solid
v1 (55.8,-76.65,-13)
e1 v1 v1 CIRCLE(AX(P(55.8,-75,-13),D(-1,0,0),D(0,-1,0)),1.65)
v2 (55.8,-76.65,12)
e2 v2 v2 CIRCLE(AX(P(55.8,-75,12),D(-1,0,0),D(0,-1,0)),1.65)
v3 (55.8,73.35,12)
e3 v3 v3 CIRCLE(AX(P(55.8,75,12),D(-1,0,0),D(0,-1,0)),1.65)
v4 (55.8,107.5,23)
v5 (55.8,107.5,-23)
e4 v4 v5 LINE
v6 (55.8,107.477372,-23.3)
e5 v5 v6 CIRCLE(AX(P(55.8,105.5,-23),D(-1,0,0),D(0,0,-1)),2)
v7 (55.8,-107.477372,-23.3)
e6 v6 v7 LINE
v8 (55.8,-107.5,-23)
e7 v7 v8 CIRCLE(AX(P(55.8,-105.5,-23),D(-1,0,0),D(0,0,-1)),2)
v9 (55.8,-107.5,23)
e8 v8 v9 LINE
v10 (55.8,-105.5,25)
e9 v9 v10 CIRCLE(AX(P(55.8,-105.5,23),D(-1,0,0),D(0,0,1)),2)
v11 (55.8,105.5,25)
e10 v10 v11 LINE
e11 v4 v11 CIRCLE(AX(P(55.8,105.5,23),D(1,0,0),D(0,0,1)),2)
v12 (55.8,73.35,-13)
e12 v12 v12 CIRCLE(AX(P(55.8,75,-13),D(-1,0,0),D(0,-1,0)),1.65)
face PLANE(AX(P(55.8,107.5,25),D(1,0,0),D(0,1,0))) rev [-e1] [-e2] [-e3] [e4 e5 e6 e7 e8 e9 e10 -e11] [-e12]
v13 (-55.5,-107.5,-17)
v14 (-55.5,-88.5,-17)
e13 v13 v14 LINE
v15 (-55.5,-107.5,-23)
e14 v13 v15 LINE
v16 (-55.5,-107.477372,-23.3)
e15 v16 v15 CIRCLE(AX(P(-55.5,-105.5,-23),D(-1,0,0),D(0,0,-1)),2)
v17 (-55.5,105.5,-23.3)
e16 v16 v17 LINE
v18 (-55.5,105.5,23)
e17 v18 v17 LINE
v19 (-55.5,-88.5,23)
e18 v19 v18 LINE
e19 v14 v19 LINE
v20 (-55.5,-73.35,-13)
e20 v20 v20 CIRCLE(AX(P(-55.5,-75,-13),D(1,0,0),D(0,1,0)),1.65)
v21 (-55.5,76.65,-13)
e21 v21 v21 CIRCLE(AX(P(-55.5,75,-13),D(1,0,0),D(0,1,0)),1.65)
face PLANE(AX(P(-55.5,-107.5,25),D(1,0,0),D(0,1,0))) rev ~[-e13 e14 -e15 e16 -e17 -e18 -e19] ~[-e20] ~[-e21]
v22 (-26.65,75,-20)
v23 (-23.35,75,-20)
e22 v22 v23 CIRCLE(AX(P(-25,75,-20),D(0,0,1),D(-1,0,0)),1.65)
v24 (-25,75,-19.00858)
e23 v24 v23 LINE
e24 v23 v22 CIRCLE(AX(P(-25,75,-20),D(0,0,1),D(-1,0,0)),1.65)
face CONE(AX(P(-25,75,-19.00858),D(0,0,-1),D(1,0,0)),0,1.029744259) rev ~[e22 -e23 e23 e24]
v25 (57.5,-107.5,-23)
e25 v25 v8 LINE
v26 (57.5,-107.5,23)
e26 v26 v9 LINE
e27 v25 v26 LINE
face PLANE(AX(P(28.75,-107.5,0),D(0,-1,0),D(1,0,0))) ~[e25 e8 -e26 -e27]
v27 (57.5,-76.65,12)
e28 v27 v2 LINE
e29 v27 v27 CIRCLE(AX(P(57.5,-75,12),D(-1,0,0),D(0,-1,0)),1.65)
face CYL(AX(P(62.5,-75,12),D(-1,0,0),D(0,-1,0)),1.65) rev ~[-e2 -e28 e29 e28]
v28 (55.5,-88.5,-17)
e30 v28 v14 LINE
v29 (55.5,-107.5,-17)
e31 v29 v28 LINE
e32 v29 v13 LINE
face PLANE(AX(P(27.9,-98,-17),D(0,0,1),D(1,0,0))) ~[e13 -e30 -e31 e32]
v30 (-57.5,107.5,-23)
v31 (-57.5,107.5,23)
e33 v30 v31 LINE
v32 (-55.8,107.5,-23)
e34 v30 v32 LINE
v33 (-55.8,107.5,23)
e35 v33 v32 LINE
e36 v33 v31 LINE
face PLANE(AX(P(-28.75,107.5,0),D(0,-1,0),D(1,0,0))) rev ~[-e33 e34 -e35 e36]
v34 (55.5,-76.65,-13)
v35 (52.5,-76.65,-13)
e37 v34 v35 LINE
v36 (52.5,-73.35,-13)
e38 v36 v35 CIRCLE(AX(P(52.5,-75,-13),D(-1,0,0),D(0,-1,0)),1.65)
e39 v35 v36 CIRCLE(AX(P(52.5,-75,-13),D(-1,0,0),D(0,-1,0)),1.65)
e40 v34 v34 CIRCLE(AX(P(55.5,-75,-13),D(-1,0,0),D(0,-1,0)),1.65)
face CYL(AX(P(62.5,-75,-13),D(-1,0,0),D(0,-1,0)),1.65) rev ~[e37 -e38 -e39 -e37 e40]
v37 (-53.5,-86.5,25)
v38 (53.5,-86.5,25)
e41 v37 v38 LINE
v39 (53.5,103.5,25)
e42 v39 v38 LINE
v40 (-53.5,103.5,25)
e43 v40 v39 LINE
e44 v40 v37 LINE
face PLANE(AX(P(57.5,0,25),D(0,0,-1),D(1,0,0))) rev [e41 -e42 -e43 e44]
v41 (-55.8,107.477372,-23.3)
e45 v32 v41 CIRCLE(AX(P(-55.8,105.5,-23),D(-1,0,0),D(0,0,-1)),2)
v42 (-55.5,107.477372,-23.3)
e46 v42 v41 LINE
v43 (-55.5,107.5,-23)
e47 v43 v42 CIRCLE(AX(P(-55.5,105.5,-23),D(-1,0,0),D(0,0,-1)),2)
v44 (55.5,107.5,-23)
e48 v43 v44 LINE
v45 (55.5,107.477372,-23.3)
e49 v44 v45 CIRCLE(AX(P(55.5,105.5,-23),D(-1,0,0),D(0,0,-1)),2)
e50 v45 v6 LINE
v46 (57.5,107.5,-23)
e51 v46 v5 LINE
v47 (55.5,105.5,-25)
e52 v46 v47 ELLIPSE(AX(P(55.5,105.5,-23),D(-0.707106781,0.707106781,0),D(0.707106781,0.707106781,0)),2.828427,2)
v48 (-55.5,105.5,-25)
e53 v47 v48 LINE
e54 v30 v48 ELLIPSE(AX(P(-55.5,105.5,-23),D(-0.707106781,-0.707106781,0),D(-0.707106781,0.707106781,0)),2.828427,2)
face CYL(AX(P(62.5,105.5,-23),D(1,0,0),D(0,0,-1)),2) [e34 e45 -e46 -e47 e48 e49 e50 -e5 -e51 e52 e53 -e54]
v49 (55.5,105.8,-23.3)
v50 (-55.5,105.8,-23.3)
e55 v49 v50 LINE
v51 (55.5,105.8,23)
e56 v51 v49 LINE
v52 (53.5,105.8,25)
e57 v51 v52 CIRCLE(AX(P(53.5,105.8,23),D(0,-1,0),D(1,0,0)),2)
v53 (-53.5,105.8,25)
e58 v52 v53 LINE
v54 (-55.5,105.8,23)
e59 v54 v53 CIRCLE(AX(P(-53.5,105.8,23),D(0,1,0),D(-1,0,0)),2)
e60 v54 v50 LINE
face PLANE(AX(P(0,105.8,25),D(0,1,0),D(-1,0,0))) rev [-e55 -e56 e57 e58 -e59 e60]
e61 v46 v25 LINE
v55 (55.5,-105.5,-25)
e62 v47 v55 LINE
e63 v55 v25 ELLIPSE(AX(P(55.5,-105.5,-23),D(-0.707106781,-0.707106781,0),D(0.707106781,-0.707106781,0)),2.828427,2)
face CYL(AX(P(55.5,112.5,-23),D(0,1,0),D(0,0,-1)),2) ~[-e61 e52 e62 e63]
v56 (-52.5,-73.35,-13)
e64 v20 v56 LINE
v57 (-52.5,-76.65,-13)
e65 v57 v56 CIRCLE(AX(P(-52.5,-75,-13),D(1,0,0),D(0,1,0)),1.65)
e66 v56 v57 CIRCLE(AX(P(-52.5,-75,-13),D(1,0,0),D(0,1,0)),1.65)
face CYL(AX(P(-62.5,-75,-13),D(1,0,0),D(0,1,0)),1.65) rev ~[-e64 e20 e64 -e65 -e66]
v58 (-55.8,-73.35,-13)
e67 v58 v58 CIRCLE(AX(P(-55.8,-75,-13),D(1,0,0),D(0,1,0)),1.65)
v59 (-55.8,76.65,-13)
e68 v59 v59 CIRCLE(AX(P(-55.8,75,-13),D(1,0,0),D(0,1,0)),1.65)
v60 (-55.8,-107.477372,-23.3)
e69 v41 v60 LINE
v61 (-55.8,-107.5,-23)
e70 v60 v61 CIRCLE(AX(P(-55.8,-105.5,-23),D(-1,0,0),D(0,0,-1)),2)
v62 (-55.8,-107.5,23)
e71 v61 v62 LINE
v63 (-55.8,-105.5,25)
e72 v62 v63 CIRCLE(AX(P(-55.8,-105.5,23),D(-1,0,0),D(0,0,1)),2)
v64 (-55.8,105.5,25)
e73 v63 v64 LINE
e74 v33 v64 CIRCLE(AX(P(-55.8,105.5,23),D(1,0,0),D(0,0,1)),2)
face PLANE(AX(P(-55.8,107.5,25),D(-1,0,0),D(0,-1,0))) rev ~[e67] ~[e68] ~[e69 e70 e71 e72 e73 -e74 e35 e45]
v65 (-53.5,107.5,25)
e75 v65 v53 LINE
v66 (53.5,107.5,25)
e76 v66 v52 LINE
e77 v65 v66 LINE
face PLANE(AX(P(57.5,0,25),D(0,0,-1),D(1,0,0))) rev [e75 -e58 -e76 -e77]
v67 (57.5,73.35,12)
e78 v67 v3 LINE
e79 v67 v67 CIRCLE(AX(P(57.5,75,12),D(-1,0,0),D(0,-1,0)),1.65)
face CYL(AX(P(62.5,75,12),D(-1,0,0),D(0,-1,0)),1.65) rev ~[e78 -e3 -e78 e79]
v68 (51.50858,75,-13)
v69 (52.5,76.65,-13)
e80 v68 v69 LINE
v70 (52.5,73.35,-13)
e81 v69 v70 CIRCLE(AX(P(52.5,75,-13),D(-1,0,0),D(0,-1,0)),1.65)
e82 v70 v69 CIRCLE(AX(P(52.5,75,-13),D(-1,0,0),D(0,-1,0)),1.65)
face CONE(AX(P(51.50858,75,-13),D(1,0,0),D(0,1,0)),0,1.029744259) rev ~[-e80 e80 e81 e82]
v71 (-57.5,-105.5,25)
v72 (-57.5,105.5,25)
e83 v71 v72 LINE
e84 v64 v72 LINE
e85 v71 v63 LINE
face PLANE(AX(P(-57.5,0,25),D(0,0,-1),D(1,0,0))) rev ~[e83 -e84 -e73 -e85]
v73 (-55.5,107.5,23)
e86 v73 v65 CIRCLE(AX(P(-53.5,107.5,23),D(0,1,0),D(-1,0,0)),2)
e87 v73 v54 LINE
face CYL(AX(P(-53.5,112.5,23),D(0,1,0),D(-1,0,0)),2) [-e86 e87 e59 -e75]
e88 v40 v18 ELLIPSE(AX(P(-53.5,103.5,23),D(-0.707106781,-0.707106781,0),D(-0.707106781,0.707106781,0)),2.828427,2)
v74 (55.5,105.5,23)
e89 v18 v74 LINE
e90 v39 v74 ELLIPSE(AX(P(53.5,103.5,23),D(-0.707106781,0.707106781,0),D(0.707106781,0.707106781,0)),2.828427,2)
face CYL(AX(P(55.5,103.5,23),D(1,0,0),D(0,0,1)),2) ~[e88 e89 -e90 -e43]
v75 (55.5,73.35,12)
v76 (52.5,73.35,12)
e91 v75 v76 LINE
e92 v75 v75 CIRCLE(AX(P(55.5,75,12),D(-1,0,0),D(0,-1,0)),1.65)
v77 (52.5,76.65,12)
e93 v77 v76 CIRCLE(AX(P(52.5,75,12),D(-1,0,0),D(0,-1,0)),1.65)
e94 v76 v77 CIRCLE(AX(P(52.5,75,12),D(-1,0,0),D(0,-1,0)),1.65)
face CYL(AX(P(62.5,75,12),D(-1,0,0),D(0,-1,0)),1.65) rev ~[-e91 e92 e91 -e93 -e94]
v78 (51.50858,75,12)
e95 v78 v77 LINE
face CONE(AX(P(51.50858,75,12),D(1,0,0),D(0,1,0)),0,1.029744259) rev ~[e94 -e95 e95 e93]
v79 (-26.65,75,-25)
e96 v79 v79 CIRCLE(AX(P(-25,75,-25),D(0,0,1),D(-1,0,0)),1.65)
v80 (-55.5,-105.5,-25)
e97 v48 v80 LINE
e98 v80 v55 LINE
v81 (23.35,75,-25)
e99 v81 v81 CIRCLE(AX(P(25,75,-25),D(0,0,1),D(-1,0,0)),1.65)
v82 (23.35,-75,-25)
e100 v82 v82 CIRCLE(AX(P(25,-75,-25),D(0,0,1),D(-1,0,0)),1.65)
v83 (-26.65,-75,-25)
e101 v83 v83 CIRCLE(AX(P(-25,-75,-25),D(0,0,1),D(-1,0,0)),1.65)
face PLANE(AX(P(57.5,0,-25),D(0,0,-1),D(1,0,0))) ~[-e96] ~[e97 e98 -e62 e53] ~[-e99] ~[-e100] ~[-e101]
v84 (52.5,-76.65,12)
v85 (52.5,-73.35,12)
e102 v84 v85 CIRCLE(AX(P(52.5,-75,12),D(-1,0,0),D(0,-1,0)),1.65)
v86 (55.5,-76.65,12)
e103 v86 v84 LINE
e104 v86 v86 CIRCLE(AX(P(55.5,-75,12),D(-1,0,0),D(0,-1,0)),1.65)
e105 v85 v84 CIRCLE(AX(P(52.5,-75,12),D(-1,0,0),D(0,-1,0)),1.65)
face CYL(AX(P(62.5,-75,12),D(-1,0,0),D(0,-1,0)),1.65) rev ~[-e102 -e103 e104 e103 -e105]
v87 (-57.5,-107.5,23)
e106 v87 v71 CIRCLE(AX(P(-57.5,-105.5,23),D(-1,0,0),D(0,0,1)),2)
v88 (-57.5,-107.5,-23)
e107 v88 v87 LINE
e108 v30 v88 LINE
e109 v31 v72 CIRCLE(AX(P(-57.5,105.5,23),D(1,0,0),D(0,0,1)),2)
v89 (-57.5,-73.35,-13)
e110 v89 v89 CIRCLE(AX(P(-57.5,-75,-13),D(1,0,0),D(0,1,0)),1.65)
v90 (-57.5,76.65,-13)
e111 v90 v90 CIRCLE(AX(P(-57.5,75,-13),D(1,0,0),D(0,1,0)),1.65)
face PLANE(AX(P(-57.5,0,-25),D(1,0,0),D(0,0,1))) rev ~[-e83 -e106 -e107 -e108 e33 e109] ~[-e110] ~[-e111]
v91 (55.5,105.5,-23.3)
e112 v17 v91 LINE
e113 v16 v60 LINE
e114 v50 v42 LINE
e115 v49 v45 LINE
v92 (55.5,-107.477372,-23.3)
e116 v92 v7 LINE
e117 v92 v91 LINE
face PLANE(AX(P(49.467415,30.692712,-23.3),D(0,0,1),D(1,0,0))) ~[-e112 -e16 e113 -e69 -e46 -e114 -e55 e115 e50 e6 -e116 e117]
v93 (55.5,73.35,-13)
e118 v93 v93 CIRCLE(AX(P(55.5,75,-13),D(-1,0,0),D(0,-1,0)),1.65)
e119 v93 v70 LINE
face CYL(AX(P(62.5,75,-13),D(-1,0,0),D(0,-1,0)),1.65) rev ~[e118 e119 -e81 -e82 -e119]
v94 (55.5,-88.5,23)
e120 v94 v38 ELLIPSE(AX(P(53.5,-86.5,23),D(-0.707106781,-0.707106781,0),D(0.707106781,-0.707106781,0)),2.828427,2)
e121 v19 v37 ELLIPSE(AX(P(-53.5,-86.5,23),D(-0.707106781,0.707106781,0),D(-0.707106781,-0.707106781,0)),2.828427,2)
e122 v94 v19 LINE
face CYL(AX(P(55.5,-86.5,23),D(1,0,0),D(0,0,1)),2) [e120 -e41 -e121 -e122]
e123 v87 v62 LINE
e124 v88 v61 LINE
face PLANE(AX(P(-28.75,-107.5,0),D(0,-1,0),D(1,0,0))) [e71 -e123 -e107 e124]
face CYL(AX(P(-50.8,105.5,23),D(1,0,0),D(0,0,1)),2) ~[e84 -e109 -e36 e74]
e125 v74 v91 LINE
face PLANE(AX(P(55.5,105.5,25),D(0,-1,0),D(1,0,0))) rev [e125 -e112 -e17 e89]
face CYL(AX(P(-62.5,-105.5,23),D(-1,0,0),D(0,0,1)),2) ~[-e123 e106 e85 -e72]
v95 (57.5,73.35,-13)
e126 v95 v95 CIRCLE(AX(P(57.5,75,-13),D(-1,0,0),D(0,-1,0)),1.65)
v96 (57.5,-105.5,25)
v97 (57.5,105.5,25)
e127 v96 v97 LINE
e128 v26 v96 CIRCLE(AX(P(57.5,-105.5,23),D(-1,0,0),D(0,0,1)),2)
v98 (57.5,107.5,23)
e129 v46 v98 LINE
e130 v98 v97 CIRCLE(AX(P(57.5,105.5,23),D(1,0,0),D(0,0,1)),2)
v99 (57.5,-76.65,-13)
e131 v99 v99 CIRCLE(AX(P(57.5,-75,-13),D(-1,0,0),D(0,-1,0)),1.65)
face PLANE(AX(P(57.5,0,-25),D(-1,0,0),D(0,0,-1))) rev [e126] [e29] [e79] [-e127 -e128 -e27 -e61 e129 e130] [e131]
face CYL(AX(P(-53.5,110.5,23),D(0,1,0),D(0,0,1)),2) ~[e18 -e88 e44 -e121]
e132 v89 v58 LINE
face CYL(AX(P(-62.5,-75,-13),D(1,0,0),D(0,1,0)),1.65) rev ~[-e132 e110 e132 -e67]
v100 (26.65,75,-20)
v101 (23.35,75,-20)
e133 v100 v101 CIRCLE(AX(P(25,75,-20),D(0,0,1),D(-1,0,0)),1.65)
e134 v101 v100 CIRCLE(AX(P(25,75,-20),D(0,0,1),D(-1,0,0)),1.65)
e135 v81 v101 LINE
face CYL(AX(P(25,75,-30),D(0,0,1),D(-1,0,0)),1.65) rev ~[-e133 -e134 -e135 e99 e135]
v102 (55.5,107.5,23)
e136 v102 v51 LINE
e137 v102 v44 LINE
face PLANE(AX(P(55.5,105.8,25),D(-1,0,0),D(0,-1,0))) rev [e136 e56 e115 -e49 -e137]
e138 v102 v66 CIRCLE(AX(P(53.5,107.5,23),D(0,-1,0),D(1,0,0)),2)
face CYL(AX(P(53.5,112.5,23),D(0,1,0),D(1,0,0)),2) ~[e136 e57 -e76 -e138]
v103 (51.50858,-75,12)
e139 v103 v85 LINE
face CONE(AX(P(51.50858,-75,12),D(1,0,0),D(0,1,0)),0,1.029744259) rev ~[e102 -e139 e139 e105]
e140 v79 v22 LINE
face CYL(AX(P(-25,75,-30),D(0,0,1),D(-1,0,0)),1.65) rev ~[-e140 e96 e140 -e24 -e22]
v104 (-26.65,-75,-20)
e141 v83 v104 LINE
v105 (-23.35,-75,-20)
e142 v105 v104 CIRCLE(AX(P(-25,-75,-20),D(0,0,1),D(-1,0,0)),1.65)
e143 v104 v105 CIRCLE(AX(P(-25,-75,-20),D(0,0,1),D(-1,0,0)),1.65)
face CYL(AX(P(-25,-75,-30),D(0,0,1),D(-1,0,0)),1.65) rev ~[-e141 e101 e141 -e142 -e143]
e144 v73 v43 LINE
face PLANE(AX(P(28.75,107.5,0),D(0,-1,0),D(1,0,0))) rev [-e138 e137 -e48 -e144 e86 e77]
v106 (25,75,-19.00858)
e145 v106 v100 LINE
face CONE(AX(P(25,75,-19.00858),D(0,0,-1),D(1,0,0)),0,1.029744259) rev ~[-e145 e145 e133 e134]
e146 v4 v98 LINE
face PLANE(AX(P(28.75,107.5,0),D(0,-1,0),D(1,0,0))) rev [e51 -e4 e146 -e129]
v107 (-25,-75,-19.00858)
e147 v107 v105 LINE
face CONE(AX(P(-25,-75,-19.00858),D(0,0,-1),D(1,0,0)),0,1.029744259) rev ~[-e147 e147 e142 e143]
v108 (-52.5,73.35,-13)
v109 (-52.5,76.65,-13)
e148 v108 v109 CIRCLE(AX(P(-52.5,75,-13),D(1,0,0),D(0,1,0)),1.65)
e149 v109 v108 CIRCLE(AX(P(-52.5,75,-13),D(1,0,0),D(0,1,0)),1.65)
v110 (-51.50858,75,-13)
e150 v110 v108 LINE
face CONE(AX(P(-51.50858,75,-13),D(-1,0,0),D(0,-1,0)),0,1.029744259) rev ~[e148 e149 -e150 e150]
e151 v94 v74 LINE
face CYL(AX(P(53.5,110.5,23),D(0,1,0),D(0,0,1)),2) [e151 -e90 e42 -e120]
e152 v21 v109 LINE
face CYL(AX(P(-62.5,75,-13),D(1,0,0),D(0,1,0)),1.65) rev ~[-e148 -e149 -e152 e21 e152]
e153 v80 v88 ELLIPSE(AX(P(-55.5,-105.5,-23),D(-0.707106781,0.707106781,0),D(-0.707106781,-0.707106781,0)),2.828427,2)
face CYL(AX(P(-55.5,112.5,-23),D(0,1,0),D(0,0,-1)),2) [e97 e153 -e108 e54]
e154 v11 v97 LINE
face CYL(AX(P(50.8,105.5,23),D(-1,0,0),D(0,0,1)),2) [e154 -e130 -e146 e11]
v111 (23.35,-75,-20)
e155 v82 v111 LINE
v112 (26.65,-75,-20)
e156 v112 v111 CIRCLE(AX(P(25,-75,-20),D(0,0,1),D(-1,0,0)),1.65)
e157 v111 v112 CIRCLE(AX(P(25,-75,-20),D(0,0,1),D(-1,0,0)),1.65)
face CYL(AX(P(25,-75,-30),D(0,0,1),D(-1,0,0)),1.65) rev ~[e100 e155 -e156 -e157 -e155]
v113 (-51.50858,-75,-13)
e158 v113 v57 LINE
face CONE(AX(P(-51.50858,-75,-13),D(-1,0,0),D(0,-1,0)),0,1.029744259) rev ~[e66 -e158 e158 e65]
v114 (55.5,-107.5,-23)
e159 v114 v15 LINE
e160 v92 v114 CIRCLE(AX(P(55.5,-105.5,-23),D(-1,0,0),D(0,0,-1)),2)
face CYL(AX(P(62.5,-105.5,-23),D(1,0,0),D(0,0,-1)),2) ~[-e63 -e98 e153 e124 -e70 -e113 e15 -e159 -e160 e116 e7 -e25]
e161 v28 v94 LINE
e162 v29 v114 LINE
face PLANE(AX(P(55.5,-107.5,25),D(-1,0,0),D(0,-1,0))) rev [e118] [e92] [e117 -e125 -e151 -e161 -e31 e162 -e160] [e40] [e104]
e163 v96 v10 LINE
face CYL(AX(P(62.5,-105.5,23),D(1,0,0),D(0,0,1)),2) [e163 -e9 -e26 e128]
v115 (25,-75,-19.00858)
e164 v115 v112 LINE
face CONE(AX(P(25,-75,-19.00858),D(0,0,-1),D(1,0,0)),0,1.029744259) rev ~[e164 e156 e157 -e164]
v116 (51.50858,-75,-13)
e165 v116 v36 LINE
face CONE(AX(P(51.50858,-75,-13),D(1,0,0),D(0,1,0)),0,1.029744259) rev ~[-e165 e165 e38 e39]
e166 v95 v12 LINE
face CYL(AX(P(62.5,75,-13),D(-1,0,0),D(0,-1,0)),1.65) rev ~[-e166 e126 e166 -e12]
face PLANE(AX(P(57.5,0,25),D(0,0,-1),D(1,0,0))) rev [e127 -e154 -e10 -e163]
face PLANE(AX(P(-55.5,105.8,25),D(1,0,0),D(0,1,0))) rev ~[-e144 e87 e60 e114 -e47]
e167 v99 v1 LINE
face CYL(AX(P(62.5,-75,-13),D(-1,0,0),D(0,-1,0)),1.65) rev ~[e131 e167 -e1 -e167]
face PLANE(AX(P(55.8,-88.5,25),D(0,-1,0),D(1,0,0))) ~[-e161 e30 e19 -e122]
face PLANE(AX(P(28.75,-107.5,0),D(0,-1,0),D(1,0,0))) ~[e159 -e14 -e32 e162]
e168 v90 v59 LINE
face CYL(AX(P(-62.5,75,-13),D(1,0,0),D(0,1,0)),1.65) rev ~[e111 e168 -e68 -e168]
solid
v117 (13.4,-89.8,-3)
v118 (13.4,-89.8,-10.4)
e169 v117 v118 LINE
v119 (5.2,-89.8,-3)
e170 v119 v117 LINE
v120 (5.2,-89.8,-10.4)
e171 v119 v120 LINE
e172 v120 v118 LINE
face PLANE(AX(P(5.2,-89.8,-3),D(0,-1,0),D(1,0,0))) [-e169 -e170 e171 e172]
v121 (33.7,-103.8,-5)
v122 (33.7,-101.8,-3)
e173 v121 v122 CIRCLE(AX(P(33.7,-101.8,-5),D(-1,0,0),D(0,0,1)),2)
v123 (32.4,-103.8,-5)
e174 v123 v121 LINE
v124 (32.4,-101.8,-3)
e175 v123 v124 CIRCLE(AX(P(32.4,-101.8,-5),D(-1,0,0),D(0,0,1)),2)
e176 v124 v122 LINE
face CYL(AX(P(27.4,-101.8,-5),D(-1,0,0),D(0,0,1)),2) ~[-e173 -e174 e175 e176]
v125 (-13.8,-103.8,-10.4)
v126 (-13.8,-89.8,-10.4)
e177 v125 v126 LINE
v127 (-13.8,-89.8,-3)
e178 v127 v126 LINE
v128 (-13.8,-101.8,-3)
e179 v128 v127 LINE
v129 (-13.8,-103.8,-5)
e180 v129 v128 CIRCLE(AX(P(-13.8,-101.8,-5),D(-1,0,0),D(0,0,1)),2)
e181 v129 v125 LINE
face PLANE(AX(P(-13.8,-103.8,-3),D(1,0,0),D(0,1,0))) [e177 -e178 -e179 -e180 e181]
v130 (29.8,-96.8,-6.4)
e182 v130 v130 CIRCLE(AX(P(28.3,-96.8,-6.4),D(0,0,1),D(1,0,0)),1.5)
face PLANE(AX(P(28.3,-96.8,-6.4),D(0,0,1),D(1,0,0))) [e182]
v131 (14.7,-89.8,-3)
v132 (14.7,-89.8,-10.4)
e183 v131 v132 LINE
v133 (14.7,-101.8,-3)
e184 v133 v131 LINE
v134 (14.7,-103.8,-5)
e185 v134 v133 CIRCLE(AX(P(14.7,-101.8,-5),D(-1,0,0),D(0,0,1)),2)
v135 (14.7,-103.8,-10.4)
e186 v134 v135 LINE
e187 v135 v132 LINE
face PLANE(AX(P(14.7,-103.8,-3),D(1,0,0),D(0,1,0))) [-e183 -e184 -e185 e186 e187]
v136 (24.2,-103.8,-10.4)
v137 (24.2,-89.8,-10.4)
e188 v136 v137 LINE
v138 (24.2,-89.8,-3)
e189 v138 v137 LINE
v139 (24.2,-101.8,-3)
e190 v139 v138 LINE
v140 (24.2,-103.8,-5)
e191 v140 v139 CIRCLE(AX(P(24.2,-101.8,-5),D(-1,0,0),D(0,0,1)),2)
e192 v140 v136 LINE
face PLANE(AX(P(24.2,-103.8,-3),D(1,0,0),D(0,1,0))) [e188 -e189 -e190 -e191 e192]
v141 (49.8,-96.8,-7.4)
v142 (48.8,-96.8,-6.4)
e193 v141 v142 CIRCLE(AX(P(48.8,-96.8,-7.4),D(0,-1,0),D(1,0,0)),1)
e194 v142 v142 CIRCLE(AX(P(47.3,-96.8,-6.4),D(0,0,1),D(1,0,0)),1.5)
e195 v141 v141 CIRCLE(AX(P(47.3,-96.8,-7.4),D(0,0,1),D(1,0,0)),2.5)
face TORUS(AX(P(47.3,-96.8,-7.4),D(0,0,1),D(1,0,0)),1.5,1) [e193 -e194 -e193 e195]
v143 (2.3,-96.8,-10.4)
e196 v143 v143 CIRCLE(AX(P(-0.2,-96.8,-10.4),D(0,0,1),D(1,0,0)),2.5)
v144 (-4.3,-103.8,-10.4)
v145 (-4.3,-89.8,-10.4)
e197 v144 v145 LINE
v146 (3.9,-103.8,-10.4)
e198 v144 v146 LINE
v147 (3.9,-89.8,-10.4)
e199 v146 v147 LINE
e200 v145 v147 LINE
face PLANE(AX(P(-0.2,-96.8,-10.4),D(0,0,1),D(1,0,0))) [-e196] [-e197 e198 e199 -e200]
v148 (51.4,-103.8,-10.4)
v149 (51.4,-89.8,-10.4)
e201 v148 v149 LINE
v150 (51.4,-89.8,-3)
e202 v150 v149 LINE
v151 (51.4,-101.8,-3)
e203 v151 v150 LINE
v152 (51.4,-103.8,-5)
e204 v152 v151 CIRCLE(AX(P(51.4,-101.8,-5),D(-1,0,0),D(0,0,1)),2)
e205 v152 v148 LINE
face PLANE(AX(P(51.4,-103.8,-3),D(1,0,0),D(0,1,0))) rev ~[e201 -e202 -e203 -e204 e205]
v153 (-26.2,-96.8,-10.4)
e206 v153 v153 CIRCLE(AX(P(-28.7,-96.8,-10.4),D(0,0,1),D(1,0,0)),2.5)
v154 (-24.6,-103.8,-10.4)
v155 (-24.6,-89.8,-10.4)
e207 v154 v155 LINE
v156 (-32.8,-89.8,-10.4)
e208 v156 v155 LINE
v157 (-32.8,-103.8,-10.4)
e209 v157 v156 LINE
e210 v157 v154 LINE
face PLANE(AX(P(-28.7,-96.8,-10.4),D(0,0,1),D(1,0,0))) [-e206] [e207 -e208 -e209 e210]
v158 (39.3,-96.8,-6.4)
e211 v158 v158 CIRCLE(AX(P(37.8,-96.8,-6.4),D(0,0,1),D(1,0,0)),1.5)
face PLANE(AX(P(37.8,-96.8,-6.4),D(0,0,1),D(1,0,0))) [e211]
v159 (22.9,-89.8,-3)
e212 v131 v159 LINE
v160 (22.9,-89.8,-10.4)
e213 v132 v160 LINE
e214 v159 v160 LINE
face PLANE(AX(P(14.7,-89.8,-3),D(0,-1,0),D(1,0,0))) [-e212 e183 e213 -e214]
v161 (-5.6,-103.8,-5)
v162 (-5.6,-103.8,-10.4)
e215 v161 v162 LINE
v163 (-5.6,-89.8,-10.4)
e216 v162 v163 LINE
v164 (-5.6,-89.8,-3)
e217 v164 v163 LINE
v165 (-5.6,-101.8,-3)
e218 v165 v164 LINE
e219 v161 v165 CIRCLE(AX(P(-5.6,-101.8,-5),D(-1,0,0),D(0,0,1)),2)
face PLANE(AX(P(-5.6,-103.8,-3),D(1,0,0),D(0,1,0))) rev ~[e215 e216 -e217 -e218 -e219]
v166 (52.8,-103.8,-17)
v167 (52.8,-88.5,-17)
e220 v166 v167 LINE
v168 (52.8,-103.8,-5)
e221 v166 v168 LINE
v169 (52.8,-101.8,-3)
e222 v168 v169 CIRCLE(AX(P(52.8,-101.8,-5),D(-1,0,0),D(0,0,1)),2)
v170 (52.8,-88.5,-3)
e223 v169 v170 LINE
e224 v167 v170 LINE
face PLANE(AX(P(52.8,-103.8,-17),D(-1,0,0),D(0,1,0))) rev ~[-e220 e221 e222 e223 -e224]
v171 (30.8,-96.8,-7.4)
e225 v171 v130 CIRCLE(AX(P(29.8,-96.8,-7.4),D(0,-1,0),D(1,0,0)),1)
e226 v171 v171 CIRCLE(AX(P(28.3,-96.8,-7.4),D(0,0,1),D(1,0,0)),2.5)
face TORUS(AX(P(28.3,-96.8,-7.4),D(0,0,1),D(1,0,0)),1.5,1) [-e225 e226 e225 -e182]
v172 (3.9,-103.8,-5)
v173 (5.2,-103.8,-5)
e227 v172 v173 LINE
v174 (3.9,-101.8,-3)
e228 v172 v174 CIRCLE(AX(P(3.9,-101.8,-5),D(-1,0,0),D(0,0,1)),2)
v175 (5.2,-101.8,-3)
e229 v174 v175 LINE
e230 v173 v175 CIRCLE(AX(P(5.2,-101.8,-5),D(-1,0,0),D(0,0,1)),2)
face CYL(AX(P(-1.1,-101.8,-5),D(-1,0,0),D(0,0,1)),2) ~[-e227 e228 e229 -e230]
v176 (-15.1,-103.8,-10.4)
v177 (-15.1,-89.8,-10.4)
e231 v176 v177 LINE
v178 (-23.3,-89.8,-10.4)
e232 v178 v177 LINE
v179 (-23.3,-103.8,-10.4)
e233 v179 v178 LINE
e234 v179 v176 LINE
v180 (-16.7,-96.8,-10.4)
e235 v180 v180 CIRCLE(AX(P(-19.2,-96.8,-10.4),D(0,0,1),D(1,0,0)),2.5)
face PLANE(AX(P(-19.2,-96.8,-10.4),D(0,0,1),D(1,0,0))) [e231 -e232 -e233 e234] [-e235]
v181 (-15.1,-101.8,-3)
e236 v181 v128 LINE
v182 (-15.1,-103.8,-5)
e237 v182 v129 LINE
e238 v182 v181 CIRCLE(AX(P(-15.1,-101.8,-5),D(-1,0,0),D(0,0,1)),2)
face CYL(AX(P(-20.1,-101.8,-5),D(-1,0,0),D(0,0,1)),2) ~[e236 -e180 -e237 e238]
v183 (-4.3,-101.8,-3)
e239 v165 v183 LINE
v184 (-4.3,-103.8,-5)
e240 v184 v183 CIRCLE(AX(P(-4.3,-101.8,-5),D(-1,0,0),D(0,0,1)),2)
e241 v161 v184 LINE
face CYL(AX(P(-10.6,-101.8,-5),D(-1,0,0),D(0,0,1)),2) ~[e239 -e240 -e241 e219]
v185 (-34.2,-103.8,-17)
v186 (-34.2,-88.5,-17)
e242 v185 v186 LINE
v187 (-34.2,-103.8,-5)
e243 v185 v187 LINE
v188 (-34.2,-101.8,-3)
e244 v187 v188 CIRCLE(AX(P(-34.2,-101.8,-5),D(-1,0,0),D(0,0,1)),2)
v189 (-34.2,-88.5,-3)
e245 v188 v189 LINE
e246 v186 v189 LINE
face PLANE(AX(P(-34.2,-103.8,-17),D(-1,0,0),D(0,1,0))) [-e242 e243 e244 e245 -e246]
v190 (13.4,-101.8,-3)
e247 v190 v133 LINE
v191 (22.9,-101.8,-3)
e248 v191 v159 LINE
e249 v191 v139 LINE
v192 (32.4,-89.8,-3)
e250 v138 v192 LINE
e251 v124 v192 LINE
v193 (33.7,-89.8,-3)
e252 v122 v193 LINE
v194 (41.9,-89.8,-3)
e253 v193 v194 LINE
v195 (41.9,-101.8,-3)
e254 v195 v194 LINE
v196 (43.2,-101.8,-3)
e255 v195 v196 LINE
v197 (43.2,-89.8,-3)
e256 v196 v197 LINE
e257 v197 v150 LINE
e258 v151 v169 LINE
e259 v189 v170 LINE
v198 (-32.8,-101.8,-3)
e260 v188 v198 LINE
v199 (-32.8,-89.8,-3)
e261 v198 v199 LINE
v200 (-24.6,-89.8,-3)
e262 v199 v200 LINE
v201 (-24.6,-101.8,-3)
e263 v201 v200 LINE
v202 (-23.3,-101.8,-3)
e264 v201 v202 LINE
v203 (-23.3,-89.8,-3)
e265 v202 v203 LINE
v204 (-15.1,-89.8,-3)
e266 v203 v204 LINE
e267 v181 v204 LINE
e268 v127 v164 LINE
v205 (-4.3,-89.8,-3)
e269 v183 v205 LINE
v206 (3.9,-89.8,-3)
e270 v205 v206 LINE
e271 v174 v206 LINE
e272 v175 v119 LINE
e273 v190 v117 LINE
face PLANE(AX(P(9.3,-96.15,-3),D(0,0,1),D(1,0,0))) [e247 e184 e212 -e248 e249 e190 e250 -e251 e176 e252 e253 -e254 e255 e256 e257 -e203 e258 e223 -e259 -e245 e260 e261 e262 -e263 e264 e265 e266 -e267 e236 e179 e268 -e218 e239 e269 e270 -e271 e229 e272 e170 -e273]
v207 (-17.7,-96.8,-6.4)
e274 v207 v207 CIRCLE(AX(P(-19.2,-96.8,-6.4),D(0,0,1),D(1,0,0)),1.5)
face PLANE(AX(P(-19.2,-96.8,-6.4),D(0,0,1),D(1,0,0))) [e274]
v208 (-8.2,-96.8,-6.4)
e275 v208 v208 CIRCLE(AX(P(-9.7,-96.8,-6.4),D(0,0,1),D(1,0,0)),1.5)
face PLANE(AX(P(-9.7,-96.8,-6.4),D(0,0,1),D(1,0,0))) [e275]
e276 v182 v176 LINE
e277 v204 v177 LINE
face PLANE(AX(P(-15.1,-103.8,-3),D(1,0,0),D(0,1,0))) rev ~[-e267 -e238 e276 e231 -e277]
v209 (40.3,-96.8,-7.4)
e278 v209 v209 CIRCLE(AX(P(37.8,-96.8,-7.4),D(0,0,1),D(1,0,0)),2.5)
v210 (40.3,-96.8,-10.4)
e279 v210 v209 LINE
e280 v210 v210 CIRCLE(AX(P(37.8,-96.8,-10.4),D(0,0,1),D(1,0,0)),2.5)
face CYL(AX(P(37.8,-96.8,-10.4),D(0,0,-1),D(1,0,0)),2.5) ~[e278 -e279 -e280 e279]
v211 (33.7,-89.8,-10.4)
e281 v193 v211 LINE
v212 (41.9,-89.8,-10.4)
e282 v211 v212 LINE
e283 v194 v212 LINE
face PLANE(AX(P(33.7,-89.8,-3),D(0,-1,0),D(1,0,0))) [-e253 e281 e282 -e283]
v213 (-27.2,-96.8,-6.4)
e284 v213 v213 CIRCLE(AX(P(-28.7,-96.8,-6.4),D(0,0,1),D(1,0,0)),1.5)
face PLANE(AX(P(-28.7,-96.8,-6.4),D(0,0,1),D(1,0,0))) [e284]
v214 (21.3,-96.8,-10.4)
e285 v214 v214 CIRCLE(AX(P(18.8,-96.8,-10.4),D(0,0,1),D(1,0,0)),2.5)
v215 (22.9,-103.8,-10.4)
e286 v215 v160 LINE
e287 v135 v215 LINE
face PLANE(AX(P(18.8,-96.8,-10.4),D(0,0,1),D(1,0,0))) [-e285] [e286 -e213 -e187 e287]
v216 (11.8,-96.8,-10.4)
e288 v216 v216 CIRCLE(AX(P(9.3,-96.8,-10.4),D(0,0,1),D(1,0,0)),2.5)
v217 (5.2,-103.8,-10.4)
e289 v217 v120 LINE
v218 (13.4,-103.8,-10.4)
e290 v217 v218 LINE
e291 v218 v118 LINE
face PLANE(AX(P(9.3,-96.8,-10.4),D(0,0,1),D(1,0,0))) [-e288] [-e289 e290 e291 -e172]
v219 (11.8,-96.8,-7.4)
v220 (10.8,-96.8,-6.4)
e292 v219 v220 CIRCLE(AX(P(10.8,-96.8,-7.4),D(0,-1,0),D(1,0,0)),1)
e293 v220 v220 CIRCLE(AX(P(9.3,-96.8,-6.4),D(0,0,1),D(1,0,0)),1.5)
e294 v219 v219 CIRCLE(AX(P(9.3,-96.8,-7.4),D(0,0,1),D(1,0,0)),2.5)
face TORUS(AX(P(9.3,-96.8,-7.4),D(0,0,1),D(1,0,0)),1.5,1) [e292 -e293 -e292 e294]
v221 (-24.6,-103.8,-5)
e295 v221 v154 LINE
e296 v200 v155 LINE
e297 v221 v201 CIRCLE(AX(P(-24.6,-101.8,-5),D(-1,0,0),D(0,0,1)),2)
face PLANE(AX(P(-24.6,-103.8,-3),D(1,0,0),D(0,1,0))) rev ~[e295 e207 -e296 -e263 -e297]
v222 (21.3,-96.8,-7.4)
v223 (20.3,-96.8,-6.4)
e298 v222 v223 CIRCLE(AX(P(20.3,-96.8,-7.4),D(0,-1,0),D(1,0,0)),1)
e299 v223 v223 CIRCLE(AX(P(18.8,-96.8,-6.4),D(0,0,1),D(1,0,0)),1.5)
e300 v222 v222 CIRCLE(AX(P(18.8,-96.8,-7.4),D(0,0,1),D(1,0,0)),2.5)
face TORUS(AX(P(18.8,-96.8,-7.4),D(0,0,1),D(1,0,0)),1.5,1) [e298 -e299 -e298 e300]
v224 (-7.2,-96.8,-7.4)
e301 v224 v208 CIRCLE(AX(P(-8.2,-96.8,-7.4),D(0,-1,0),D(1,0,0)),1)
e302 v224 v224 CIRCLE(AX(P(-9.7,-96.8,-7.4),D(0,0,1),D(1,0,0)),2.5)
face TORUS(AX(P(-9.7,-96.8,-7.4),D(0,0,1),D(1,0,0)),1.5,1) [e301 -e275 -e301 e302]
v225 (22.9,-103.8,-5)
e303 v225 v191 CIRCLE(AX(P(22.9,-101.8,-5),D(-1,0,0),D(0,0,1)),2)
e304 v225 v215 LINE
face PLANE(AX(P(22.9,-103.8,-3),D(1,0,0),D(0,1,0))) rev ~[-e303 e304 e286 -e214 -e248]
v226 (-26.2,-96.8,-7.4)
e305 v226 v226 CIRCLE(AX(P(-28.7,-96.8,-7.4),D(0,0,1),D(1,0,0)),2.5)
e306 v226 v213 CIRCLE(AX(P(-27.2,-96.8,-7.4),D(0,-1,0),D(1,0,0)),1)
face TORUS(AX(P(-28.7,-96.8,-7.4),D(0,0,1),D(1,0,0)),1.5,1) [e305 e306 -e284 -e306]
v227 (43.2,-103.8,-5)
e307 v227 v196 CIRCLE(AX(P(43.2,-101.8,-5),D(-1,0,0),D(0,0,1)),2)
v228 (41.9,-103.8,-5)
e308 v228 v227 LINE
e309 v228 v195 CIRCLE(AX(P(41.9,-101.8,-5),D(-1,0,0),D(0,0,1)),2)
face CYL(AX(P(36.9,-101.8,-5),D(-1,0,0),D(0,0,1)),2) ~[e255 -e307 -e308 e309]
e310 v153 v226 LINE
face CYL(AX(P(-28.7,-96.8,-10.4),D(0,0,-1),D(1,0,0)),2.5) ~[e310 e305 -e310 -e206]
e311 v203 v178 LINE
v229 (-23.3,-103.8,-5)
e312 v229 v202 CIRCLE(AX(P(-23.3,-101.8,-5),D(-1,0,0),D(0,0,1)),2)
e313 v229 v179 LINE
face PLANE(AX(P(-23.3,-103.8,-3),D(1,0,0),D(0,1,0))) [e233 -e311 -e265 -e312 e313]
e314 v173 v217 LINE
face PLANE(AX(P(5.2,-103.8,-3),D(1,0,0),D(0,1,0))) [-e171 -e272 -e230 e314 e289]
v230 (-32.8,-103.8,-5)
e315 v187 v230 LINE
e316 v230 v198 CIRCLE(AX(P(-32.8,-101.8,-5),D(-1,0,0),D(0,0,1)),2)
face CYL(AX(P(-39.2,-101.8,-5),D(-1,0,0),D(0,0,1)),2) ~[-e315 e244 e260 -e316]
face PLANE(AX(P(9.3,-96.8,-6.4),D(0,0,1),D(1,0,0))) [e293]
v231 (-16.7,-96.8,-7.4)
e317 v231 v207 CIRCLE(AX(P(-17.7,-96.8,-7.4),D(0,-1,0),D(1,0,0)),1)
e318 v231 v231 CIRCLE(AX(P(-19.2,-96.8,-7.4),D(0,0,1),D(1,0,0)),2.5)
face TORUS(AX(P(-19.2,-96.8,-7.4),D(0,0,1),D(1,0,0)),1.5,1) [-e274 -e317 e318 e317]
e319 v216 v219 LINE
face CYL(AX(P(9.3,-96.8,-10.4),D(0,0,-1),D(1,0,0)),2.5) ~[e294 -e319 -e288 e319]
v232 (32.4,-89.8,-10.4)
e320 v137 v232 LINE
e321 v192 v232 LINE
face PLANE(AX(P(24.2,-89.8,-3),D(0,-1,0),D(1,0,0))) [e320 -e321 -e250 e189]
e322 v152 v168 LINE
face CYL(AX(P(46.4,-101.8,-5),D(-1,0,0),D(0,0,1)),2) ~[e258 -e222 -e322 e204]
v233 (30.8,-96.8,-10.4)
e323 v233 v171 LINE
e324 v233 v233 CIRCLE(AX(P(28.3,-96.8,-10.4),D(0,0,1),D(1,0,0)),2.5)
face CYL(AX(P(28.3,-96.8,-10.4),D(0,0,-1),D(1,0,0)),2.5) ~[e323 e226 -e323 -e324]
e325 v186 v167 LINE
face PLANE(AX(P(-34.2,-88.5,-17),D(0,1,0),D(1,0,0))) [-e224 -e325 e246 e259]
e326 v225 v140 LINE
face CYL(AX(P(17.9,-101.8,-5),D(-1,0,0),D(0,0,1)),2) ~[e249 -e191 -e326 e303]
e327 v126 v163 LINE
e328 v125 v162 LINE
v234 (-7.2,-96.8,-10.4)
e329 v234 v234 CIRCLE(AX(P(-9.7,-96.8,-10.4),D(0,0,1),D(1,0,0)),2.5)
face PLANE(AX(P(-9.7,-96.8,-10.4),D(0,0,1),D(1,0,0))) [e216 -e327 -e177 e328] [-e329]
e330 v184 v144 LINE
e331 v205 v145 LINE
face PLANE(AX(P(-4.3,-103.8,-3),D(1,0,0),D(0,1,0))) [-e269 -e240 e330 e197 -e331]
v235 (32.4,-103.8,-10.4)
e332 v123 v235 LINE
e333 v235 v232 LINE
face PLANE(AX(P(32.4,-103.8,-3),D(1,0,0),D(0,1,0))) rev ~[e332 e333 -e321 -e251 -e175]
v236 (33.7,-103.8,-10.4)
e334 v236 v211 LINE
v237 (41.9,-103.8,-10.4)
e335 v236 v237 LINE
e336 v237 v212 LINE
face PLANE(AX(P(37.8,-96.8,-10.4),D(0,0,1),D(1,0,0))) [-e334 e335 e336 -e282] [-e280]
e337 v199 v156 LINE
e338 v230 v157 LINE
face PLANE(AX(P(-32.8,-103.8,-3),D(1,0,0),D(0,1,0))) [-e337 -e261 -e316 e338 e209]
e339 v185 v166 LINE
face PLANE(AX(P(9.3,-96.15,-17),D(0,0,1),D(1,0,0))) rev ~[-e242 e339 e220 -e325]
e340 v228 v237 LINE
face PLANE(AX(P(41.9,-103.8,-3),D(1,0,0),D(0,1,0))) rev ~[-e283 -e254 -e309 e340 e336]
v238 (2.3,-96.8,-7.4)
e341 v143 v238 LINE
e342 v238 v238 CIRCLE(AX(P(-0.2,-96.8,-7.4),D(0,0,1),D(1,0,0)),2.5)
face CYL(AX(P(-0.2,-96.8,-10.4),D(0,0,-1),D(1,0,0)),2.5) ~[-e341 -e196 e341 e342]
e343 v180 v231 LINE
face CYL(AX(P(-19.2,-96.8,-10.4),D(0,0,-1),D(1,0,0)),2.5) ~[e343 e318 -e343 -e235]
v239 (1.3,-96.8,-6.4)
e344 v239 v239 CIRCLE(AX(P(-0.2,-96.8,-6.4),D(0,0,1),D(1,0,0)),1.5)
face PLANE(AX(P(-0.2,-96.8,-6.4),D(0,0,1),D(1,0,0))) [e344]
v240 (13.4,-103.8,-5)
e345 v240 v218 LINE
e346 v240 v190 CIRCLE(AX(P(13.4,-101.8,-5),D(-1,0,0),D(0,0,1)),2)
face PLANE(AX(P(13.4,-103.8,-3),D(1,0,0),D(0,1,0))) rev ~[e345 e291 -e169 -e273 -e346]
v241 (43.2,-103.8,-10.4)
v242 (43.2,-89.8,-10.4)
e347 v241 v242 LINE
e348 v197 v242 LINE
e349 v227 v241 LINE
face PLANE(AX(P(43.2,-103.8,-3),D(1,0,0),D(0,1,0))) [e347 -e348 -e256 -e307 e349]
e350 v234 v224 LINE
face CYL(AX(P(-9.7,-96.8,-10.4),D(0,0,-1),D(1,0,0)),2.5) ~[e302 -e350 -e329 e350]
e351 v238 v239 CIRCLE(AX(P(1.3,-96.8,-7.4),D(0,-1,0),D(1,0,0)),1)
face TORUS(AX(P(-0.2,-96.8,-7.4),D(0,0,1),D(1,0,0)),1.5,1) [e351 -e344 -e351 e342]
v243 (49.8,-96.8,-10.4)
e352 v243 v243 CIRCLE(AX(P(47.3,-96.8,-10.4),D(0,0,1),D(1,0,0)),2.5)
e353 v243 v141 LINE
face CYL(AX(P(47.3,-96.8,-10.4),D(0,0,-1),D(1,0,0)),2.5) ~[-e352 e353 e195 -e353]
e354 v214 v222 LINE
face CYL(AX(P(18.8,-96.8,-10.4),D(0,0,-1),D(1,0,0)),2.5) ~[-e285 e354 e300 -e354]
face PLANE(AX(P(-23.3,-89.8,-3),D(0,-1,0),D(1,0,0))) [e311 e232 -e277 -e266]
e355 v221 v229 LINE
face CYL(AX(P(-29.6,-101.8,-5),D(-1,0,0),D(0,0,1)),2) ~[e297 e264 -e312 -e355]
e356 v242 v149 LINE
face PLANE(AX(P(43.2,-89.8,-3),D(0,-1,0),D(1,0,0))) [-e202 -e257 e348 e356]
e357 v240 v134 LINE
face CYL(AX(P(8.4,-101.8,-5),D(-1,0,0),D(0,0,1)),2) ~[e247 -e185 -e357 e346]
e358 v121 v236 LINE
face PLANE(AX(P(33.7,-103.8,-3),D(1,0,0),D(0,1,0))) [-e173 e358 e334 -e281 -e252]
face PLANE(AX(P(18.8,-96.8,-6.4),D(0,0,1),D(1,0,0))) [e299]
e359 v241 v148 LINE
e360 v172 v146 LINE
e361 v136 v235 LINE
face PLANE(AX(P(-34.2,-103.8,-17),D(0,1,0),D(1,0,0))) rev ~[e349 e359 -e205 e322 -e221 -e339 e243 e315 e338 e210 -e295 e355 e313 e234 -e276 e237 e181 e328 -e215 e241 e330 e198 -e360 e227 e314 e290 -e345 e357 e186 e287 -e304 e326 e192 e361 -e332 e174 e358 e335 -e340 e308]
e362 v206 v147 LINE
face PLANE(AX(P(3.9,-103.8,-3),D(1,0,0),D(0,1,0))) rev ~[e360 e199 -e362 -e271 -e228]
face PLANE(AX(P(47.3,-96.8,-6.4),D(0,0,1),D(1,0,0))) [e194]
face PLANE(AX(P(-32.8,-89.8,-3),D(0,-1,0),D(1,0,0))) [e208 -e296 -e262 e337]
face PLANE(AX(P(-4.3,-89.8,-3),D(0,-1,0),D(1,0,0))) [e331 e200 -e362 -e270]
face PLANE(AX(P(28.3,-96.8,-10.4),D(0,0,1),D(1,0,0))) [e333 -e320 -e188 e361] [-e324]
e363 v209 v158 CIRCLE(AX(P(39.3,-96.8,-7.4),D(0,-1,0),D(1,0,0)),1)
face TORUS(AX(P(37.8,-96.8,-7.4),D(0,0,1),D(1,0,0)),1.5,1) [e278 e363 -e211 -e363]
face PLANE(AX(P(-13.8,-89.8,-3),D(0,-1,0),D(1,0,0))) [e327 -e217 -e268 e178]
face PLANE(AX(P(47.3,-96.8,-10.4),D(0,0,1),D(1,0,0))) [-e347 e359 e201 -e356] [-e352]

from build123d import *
from build123d import SkipClean  # not in build123d's __all__

# Parameters (mm, degrees)
F0_W             = 57.5
F0_H             = 50
F1_DEPTH         = 107.5
F2_W             = 55.8
F2_H             = 19
F3_DEPTH         = 42
F4_W             = 0.3
F4_H             = 19
F5_DEPTH         = 48.3
F6_T1_DEPTH      = 60.5
F6_T3_DEPTH      = 67.5
F6_T5_DEPTH      = 225
F6_T7_DEPTH      = 11.7
F6_T9_DEPTH      = 11.7
F6_T11_DEPTH     = 204
F6_T16_DEPTH     = 11.7
F8_W             = 87
F8_H             = 15.3
F9_DEPTH         = 14
F10_W            = 8.2
F10_H            = 14
F11_DEPTH        = 7.4
F12_T1_DEPTH     = 11.4
F12_T3_DEPTH     = 11.3
F12_T5_DEPTH     = 11.3
F12_T7_DEPTH     = 11.3
F12_T9_DEPTH     = 11.3
F12_T11_DEPTH    = 11.3
F12_T13_DEPTH    = 11.3
F12_T15_DEPTH    = 11.3
F12_T17_DEPTH    = 11.3
F12_T19_DEPTH    = 11.4
F12_2_T3_DEPTH   = 197.3
F12_2_T6_DEPTH   = 197.3
F13_R            = 2.5
F14_DEPTH        = 4
F15_R            = 1
F19_D            = 3.3
F19_DEPTH        = 5
F19_TIP          = 0.9914200214
F19_ON_F18_D     = 3.3
F19_ON_F18_DEPTH = 5
F19_ON_F18_TIP   = 0.9914200214
F19_ON_F17_D     = 3.3
F19_ON_F17_DEPTH = 5
F19_ON_F17_TIP   = 0.9914200214


# Not quite as in the source:
# - a fillet or chamfer that OpenCascade refuses, or shapes differently, is made with other operations: its cross-section is extruded or revolved along the edge and cut away or added


with BuildPart() as f1:
    # F0 (on Front) → F1 (new body, symmetric)
    with BuildSketch(Plane.XZ):
        with Locations((-28.75, 0)):
            Rectangle(F0_W, F0_H)
    extrude(amount=F1_DEPTH, both=True)

    # F2 (on face) → F3 (cut)
    with BuildSketch(Plane.XY.offset(25)):
        with Locations((-27.9, -98)):
            Rectangle(F2_W, F2_H)
    extrude(amount=-F3_DEPTH, mode=Mode.SUBTRACT)

    # F4 (on face) → F5 (cut)
    with BuildSketch(Plane.XY.offset(25)):
        Polygon((-55.8, 107.5), (-55.8, -88.5), (-55.5, -88.5), (-55.5, 105.5), (0, 105.5), (0, 105.8), (-55.5, 105.8), (-55.5, 107.5), align=None)
        with Locations((-55.65, -98)):
            Rectangle(F4_W, F4_H)
    extrude(amount=-F5_DEPTH, mode=Mode.SUBTRACT)

    # F6: fillet of radius 2 on 9 edges, made by hand

    # F6_s2 → F6_t1 (cut)
    with BuildSketch(Plane.YZ.offset(-55.5)):
        with BuildLine():
            ThreePointArc((-86.5, 25), (-87.9142135624, 24.4142135624), (-88.5, 23))
            Line((-88.5, 23), (-88.5, 25))
            Line((-88.5, 25), (-86.5, 25))
        make_face()
        with BuildLine():
            ThreePointArc((103.5, 25), (104.9142135624, 24.4142135624), (105.5, 23))
            Line((105.5, 23), (105.5, 25))
            Line((105.5, 25), (103.5, 25))
        make_face()
    extrude(amount=F6_T1_DEPTH, mode=Mode.SUBTRACT)

    # F6_s4 → F6_t3 (cut)
    with BuildSketch(Plane.YZ.offset(-62.5)):
        with BuildLine():
            ThreePointArc((-105.5, -25), (-106.9142135624, -24.4142135624), (-107.5, -23))
            Line((-107.5, -23), (-107.5, -25))
            Line((-107.5, -25), (-105.5, -25))
        make_face()
        with BuildLine():
            ThreePointArc((105.5, -25), (106.9142135624, -24.4142135624), (107.5, -23))
            Line((107.5, -23), (107.5, -25))
            Line((107.5, -25), (105.5, -25))
        make_face()
    extrude(amount=F6_T3_DEPTH, mode=Mode.SUBTRACT)

    # F6_s6 → F6_t5 (cut)
    with BuildSketch(Plane.XZ.offset(-112.5)):
        with BuildLine():
            ThreePointArc((-55.5, -25), (-56.9142135624, -24.4142135624), (-57.5, -23))
            Line((-57.5, -23), (-57.5, -25))
            Line((-57.5, -25), (-55.5, -25))
        make_face()
    extrude(amount=F6_T5_DEPTH, mode=Mode.SUBTRACT)

    # F6_s8 → F6_t7 (cut)
    with BuildSketch(Plane.YZ.offset(-62.5)):
        with BuildLine():
            ThreePointArc((-105.5, 25), (-106.9142135624, 24.4142135624), (-107.5, 23))
            Line((-107.5, 23), (-107.5, 25))
            Line((-107.5, 25), (-105.5, 25))
        make_face()
    extrude(amount=F6_T7_DEPTH, mode=Mode.SUBTRACT)

    # F6_s10 → F6_t9 (cut)
    with BuildSketch(Plane.XZ.offset(-112.5)):
        with BuildLine():
            ThreePointArc((-55.5, 23), (-54.9142135624, 24.4142135624), (-53.5, 25))
            Line((-53.5, 25), (-55.5, 25))
            Line((-55.5, 25), (-55.5, 23))
        make_face()
    extrude(amount=F6_T9_DEPTH, mode=Mode.SUBTRACT)

    # F6_s12 → F6_t11 (cut)
    with BuildSketch(Plane.XZ.offset(-110.5)):
        with BuildLine():
            ThreePointArc((-53.5, 25), (-54.9142135624, 24.4142135624), (-55.5, 23))
            Line((-55.5, 23), (-55.5, 25))
            Line((-55.5, 25), (-53.5, 25))
        make_face()
    with SkipClean():  # cleaning this boolean's faces spoils the solid; the shape is the same uncleaned
        extrude(amount=F6_T11_DEPTH, mode=Mode.SUBTRACT)


with BuildPart() as f6_tool14:
    # F6_s15 → F6_t16 (new body)
    with BuildSketch(Plane.YZ.offset(-50.8)):
        with BuildLine():
            ThreePointArc((105.5, 25), (106.9142135624, 24.4142135624), (107.5, 23))
            Line((107.5, 23), (107.5, 25))
            Line((107.5, 25), (105.5, 25))
        make_face()
    extrude(amount=-F6_T16_DEPTH)

    split(bisect_by=Plane.YZ.offset(-55.5), keep=Keep.BOTTOM)


with BuildPart() as f1_1:
    add(f1.part, clean=False)

    # F6_t13: cut F6_tool14
    add(f6_tool14.part, mode=Mode.SUBTRACT)

    # F7: F1 across plane


with BuildPart() as f1_2:
    add(f1_1.part, clean=False)
    add(f1_1.part.mirror(Plane.YZ), clean=False)

    # F12#2: fillet of radius 2 on 2 edges, made by hand


with BuildPart() as f9:
    # F8 (on face) → F9 (new body)
    with BuildSketch(Plane.XY.offset(-17)):
        with Locations((9.3, -96.15)):
            Rectangle(F8_W, F8_H)
    extrude(amount=F9_DEPTH)

    # F10 (on face) → F11 (cut)
    with BuildSketch(Plane.XY.offset(-3)):
        with Locations((-28.7, -96.8)):
            Rectangle(F10_W, F10_H)
        with Locations((-19.2, -96.8)):
            Rectangle(F10_W, F10_H)
        with Locations((-9.7, -96.8)):
            Rectangle(F10_W, F10_H)
        with Locations((-0.2, -96.8)):
            Rectangle(F10_W, F10_H)
        with Locations((9.3, -96.8)):
            Rectangle(F10_W, F10_H)
        with Locations((18.8, -96.8)):
            Rectangle(F10_W, F10_H)
        with Locations((28.3, -96.8)):
            Rectangle(F10_W, F10_H)
        with Locations((37.8, -96.8)):
            Rectangle(F10_W, F10_H)
        with Locations((47.3, -96.8)):
            Rectangle(F10_W, F10_H)
    extrude(amount=-F11_DEPTH, mode=Mode.SUBTRACT)

    # F12: fillet of radius 2 on 10 edges, made by hand

    # F12_s2 → F12_t1 (cut)
    with BuildSketch(Plane.YZ.offset(-39.2)):
        with BuildLine():
            ThreePointArc((-101.8, -3), (-103.2142135624, -3.5857864376), (-103.8, -5))
            Line((-103.8, -5), (-103.8, -3))
            Line((-103.8, -3), (-101.8, -3))
        make_face()
    extrude(amount=F12_T1_DEPTH, mode=Mode.SUBTRACT)

    # F12_s4 → F12_t3 (cut)
    with BuildSketch(Plane.YZ.offset(-29.6)):
        with BuildLine():
            ThreePointArc((-101.8, -3), (-103.2142135624, -3.5857864376), (-103.8, -5))
            Line((-103.8, -5), (-103.8, -3))
            Line((-103.8, -3), (-101.8, -3))
        make_face()
    extrude(amount=F12_T3_DEPTH, mode=Mode.SUBTRACT)

    # F12_s6 → F12_t5 (cut)
    with BuildSketch(Plane.YZ.offset(-20.1)):
        with BuildLine():
            ThreePointArc((-101.8, -3), (-103.2142135624, -3.5857864376), (-103.8, -5))
            Line((-103.8, -5), (-103.8, -3))
            Line((-103.8, -3), (-101.8, -3))
        make_face()
    extrude(amount=F12_T5_DEPTH, mode=Mode.SUBTRACT)

    # F12_s8 → F12_t7 (cut)
    with BuildSketch(Plane.YZ.offset(-10.6)):
        with BuildLine():
            ThreePointArc((-101.8, -3), (-103.2142135624, -3.5857864376), (-103.8, -5))
            Line((-103.8, -5), (-103.8, -3))
            Line((-103.8, -3), (-101.8, -3))
        make_face()
    extrude(amount=F12_T7_DEPTH, mode=Mode.SUBTRACT)

    # F12_s10 → F12_t9 (cut)
    with BuildSketch(Plane.YZ.offset(-1.1)):
        with BuildLine():
            ThreePointArc((-101.8, -3), (-103.2142135624, -3.5857864376), (-103.8, -5))
            Line((-103.8, -5), (-103.8, -3))
            Line((-103.8, -3), (-101.8, -3))
        make_face()
    extrude(amount=F12_T9_DEPTH, mode=Mode.SUBTRACT)

    # F12_s12 → F12_t11 (cut)
    with BuildSketch(Plane.YZ.offset(8.4)):
        with BuildLine():
            ThreePointArc((-101.8, -3), (-103.2142135624, -3.5857864376), (-103.8, -5))
            Line((-103.8, -5), (-103.8, -3))
            Line((-103.8, -3), (-101.8, -3))
        make_face()
    extrude(amount=F12_T11_DEPTH, mode=Mode.SUBTRACT)

    # F12_s14 → F12_t13 (cut)
    with BuildSketch(Plane.YZ.offset(17.9)):
        with BuildLine():
            ThreePointArc((-101.8, -3), (-103.2142135624, -3.5857864376), (-103.8, -5))
            Line((-103.8, -5), (-103.8, -3))
            Line((-103.8, -3), (-101.8, -3))
        make_face()
    extrude(amount=F12_T13_DEPTH, mode=Mode.SUBTRACT)

    # F12_s16 → F12_t15 (cut)
    with BuildSketch(Plane.YZ.offset(27.4)):
        with BuildLine():
            ThreePointArc((-101.8, -3), (-103.2142135624, -3.5857864376), (-103.8, -5))
            Line((-103.8, -5), (-103.8, -3))
            Line((-103.8, -3), (-101.8, -3))
        make_face()
    extrude(amount=F12_T15_DEPTH, mode=Mode.SUBTRACT)

    # F12_s18 → F12_t17 (cut)
    with BuildSketch(Plane.YZ.offset(36.9)):
        with BuildLine():
            ThreePointArc((-101.8, -3), (-103.2142135624, -3.5857864376), (-103.8, -5))
            Line((-103.8, -5), (-103.8, -3))
            Line((-103.8, -3), (-101.8, -3))
        make_face()
    extrude(amount=F12_T17_DEPTH, mode=Mode.SUBTRACT)

    # F12_s20 → F12_t19 (cut)
    with BuildSketch(Plane.YZ.offset(46.4)):
        with BuildLine():
            ThreePointArc((-101.8, -3), (-103.2142135624, -3.5857864376), (-103.8, -5))
            Line((-103.8, -5), (-103.8, -3))
            Line((-103.8, -3), (-101.8, -3))
        make_face()
    extrude(amount=F12_T19_DEPTH, mode=Mode.SUBTRACT)

    # F13 (on face) → F14 (join)
    with BuildSketch(Plane.XY.offset(-10.4)):
        with Locations((-28.7, -96.8)):
            Circle(F13_R)
        with Locations((-19.2, -96.8)):
            Circle(F13_R)
        with Locations((-9.7, -96.8)):
            Circle(F13_R)
        with Locations((-0.2, -96.8)):
            Circle(F13_R)
        with Locations((9.3, -96.8)):
            Circle(F13_R)
        with Locations((18.8, -96.8)):
            Circle(F13_R)
        with Locations((28.3, -96.8)):
            Circle(F13_R)
        with Locations((37.8, -96.8)):
            Circle(F13_R)
        with Locations((47.3, -96.8)):
            Circle(F13_R)
    extrude(amount=F14_DEPTH)

    # F15
    f15_edges = [f9.edges().sort_by_distance(p)[0] for p in [
        (-31.2, -96.8, -6.4),
        (-21.7, -96.8, -6.4),
        (-12.2, -96.8, -6.4),
        (-2.7, -96.8, -6.4),
        (6.8, -96.8, -6.4),
        (16.3, -96.8, -6.4),
        (25.8, -96.8, -6.4),
        (35.3, -96.8, -6.4),
        (44.8, -96.8, -6.4),
    ]]
    fillet(f15_edges, radius=F15_R)


with BuildPart() as f12_2_tool1:
    # F12_2_s2 → F12_2_t3 (new body)
    with BuildSketch(Plane.XZ.offset(91.5)):
        with BuildLine():
            ThreePointArc((-53.5, 25), (-54.9142135624, 24.4142135624), (-55.5, 23))
            Line((-55.5, 23), (-55.5, 25))
            Line((-55.5, 25), (-53.5, 25))
        make_face()
    extrude(amount=-F12_2_T3_DEPTH)


with BuildPart() as f12_2_tool4:
    # F12_2_s5 → F12_2_t6 (new body)
    with BuildSketch(Plane.XZ.offset(91.5)):
        with BuildLine():
            ThreePointArc((53.5, 25), (54.9142135624, 24.4142135624), (55.5, 23))
            Line((55.5, 23), (55.5, 25))
            Line((55.5, 25), (53.5, 25))
        make_face()
    extrude(amount=-F12_2_T6_DEPTH)


with BuildPart() as f1_3:
    add(f1_2.part, clean=False)

    # F12_2_t7: cut F12_2_tool1, F12_2_tool4
    add([f12_2_tool1.part, f12_2_tool4.part], mode=Mode.SUBTRACT)

    # F19
    with Locations(Plane(origin=(-57.5, 0, 0), x_dir=(0, -1, 0), z_dir=(-1, 0, 0))):
        with Locations((-75, -13), (75, -13)):
            Hole(F19_D / 2, depth=F19_DEPTH)
            with Locations((0, 0, -(F19_DEPTH + F19_TIP / 2))):  # 118° drill point
                Cone(0, F19_D / 2, F19_TIP, mode=Mode.SUBTRACT)

    # F19 on F18
    with Locations(Plane(origin=(0, 0, -25), x_dir=(1, 0, 0), z_dir=(0, 0, -1))):
        with Locations((-25, -75), (-25, 75), (25, -75), (25, 75)):
            Hole(F19_ON_F18_D / 2, depth=F19_ON_F18_DEPTH)
            with Locations((0, 0, -(F19_ON_F18_DEPTH + F19_ON_F18_TIP / 2))):  # 118° drill point
                Cone(0, F19_ON_F18_D / 2, F19_ON_F18_TIP, mode=Mode.SUBTRACT)

    # F19 on F17
    with Locations(Plane.YZ.offset(57.5)):
        with Locations((-75, -13), (-75, 12), (75, 12), (75, -13)):
            Hole(F19_ON_F17_D / 2, depth=F19_ON_F17_DEPTH)
            with Locations((0, 0, -(F19_ON_F17_DEPTH + F19_ON_F17_TIP / 2))):  # 118° drill point
                Cone(0, F19_ON_F17_D / 2, F19_ON_F17_TIP, mode=Mode.SUBTRACT)


solid = Compound([f9.part, f1_3.part])
